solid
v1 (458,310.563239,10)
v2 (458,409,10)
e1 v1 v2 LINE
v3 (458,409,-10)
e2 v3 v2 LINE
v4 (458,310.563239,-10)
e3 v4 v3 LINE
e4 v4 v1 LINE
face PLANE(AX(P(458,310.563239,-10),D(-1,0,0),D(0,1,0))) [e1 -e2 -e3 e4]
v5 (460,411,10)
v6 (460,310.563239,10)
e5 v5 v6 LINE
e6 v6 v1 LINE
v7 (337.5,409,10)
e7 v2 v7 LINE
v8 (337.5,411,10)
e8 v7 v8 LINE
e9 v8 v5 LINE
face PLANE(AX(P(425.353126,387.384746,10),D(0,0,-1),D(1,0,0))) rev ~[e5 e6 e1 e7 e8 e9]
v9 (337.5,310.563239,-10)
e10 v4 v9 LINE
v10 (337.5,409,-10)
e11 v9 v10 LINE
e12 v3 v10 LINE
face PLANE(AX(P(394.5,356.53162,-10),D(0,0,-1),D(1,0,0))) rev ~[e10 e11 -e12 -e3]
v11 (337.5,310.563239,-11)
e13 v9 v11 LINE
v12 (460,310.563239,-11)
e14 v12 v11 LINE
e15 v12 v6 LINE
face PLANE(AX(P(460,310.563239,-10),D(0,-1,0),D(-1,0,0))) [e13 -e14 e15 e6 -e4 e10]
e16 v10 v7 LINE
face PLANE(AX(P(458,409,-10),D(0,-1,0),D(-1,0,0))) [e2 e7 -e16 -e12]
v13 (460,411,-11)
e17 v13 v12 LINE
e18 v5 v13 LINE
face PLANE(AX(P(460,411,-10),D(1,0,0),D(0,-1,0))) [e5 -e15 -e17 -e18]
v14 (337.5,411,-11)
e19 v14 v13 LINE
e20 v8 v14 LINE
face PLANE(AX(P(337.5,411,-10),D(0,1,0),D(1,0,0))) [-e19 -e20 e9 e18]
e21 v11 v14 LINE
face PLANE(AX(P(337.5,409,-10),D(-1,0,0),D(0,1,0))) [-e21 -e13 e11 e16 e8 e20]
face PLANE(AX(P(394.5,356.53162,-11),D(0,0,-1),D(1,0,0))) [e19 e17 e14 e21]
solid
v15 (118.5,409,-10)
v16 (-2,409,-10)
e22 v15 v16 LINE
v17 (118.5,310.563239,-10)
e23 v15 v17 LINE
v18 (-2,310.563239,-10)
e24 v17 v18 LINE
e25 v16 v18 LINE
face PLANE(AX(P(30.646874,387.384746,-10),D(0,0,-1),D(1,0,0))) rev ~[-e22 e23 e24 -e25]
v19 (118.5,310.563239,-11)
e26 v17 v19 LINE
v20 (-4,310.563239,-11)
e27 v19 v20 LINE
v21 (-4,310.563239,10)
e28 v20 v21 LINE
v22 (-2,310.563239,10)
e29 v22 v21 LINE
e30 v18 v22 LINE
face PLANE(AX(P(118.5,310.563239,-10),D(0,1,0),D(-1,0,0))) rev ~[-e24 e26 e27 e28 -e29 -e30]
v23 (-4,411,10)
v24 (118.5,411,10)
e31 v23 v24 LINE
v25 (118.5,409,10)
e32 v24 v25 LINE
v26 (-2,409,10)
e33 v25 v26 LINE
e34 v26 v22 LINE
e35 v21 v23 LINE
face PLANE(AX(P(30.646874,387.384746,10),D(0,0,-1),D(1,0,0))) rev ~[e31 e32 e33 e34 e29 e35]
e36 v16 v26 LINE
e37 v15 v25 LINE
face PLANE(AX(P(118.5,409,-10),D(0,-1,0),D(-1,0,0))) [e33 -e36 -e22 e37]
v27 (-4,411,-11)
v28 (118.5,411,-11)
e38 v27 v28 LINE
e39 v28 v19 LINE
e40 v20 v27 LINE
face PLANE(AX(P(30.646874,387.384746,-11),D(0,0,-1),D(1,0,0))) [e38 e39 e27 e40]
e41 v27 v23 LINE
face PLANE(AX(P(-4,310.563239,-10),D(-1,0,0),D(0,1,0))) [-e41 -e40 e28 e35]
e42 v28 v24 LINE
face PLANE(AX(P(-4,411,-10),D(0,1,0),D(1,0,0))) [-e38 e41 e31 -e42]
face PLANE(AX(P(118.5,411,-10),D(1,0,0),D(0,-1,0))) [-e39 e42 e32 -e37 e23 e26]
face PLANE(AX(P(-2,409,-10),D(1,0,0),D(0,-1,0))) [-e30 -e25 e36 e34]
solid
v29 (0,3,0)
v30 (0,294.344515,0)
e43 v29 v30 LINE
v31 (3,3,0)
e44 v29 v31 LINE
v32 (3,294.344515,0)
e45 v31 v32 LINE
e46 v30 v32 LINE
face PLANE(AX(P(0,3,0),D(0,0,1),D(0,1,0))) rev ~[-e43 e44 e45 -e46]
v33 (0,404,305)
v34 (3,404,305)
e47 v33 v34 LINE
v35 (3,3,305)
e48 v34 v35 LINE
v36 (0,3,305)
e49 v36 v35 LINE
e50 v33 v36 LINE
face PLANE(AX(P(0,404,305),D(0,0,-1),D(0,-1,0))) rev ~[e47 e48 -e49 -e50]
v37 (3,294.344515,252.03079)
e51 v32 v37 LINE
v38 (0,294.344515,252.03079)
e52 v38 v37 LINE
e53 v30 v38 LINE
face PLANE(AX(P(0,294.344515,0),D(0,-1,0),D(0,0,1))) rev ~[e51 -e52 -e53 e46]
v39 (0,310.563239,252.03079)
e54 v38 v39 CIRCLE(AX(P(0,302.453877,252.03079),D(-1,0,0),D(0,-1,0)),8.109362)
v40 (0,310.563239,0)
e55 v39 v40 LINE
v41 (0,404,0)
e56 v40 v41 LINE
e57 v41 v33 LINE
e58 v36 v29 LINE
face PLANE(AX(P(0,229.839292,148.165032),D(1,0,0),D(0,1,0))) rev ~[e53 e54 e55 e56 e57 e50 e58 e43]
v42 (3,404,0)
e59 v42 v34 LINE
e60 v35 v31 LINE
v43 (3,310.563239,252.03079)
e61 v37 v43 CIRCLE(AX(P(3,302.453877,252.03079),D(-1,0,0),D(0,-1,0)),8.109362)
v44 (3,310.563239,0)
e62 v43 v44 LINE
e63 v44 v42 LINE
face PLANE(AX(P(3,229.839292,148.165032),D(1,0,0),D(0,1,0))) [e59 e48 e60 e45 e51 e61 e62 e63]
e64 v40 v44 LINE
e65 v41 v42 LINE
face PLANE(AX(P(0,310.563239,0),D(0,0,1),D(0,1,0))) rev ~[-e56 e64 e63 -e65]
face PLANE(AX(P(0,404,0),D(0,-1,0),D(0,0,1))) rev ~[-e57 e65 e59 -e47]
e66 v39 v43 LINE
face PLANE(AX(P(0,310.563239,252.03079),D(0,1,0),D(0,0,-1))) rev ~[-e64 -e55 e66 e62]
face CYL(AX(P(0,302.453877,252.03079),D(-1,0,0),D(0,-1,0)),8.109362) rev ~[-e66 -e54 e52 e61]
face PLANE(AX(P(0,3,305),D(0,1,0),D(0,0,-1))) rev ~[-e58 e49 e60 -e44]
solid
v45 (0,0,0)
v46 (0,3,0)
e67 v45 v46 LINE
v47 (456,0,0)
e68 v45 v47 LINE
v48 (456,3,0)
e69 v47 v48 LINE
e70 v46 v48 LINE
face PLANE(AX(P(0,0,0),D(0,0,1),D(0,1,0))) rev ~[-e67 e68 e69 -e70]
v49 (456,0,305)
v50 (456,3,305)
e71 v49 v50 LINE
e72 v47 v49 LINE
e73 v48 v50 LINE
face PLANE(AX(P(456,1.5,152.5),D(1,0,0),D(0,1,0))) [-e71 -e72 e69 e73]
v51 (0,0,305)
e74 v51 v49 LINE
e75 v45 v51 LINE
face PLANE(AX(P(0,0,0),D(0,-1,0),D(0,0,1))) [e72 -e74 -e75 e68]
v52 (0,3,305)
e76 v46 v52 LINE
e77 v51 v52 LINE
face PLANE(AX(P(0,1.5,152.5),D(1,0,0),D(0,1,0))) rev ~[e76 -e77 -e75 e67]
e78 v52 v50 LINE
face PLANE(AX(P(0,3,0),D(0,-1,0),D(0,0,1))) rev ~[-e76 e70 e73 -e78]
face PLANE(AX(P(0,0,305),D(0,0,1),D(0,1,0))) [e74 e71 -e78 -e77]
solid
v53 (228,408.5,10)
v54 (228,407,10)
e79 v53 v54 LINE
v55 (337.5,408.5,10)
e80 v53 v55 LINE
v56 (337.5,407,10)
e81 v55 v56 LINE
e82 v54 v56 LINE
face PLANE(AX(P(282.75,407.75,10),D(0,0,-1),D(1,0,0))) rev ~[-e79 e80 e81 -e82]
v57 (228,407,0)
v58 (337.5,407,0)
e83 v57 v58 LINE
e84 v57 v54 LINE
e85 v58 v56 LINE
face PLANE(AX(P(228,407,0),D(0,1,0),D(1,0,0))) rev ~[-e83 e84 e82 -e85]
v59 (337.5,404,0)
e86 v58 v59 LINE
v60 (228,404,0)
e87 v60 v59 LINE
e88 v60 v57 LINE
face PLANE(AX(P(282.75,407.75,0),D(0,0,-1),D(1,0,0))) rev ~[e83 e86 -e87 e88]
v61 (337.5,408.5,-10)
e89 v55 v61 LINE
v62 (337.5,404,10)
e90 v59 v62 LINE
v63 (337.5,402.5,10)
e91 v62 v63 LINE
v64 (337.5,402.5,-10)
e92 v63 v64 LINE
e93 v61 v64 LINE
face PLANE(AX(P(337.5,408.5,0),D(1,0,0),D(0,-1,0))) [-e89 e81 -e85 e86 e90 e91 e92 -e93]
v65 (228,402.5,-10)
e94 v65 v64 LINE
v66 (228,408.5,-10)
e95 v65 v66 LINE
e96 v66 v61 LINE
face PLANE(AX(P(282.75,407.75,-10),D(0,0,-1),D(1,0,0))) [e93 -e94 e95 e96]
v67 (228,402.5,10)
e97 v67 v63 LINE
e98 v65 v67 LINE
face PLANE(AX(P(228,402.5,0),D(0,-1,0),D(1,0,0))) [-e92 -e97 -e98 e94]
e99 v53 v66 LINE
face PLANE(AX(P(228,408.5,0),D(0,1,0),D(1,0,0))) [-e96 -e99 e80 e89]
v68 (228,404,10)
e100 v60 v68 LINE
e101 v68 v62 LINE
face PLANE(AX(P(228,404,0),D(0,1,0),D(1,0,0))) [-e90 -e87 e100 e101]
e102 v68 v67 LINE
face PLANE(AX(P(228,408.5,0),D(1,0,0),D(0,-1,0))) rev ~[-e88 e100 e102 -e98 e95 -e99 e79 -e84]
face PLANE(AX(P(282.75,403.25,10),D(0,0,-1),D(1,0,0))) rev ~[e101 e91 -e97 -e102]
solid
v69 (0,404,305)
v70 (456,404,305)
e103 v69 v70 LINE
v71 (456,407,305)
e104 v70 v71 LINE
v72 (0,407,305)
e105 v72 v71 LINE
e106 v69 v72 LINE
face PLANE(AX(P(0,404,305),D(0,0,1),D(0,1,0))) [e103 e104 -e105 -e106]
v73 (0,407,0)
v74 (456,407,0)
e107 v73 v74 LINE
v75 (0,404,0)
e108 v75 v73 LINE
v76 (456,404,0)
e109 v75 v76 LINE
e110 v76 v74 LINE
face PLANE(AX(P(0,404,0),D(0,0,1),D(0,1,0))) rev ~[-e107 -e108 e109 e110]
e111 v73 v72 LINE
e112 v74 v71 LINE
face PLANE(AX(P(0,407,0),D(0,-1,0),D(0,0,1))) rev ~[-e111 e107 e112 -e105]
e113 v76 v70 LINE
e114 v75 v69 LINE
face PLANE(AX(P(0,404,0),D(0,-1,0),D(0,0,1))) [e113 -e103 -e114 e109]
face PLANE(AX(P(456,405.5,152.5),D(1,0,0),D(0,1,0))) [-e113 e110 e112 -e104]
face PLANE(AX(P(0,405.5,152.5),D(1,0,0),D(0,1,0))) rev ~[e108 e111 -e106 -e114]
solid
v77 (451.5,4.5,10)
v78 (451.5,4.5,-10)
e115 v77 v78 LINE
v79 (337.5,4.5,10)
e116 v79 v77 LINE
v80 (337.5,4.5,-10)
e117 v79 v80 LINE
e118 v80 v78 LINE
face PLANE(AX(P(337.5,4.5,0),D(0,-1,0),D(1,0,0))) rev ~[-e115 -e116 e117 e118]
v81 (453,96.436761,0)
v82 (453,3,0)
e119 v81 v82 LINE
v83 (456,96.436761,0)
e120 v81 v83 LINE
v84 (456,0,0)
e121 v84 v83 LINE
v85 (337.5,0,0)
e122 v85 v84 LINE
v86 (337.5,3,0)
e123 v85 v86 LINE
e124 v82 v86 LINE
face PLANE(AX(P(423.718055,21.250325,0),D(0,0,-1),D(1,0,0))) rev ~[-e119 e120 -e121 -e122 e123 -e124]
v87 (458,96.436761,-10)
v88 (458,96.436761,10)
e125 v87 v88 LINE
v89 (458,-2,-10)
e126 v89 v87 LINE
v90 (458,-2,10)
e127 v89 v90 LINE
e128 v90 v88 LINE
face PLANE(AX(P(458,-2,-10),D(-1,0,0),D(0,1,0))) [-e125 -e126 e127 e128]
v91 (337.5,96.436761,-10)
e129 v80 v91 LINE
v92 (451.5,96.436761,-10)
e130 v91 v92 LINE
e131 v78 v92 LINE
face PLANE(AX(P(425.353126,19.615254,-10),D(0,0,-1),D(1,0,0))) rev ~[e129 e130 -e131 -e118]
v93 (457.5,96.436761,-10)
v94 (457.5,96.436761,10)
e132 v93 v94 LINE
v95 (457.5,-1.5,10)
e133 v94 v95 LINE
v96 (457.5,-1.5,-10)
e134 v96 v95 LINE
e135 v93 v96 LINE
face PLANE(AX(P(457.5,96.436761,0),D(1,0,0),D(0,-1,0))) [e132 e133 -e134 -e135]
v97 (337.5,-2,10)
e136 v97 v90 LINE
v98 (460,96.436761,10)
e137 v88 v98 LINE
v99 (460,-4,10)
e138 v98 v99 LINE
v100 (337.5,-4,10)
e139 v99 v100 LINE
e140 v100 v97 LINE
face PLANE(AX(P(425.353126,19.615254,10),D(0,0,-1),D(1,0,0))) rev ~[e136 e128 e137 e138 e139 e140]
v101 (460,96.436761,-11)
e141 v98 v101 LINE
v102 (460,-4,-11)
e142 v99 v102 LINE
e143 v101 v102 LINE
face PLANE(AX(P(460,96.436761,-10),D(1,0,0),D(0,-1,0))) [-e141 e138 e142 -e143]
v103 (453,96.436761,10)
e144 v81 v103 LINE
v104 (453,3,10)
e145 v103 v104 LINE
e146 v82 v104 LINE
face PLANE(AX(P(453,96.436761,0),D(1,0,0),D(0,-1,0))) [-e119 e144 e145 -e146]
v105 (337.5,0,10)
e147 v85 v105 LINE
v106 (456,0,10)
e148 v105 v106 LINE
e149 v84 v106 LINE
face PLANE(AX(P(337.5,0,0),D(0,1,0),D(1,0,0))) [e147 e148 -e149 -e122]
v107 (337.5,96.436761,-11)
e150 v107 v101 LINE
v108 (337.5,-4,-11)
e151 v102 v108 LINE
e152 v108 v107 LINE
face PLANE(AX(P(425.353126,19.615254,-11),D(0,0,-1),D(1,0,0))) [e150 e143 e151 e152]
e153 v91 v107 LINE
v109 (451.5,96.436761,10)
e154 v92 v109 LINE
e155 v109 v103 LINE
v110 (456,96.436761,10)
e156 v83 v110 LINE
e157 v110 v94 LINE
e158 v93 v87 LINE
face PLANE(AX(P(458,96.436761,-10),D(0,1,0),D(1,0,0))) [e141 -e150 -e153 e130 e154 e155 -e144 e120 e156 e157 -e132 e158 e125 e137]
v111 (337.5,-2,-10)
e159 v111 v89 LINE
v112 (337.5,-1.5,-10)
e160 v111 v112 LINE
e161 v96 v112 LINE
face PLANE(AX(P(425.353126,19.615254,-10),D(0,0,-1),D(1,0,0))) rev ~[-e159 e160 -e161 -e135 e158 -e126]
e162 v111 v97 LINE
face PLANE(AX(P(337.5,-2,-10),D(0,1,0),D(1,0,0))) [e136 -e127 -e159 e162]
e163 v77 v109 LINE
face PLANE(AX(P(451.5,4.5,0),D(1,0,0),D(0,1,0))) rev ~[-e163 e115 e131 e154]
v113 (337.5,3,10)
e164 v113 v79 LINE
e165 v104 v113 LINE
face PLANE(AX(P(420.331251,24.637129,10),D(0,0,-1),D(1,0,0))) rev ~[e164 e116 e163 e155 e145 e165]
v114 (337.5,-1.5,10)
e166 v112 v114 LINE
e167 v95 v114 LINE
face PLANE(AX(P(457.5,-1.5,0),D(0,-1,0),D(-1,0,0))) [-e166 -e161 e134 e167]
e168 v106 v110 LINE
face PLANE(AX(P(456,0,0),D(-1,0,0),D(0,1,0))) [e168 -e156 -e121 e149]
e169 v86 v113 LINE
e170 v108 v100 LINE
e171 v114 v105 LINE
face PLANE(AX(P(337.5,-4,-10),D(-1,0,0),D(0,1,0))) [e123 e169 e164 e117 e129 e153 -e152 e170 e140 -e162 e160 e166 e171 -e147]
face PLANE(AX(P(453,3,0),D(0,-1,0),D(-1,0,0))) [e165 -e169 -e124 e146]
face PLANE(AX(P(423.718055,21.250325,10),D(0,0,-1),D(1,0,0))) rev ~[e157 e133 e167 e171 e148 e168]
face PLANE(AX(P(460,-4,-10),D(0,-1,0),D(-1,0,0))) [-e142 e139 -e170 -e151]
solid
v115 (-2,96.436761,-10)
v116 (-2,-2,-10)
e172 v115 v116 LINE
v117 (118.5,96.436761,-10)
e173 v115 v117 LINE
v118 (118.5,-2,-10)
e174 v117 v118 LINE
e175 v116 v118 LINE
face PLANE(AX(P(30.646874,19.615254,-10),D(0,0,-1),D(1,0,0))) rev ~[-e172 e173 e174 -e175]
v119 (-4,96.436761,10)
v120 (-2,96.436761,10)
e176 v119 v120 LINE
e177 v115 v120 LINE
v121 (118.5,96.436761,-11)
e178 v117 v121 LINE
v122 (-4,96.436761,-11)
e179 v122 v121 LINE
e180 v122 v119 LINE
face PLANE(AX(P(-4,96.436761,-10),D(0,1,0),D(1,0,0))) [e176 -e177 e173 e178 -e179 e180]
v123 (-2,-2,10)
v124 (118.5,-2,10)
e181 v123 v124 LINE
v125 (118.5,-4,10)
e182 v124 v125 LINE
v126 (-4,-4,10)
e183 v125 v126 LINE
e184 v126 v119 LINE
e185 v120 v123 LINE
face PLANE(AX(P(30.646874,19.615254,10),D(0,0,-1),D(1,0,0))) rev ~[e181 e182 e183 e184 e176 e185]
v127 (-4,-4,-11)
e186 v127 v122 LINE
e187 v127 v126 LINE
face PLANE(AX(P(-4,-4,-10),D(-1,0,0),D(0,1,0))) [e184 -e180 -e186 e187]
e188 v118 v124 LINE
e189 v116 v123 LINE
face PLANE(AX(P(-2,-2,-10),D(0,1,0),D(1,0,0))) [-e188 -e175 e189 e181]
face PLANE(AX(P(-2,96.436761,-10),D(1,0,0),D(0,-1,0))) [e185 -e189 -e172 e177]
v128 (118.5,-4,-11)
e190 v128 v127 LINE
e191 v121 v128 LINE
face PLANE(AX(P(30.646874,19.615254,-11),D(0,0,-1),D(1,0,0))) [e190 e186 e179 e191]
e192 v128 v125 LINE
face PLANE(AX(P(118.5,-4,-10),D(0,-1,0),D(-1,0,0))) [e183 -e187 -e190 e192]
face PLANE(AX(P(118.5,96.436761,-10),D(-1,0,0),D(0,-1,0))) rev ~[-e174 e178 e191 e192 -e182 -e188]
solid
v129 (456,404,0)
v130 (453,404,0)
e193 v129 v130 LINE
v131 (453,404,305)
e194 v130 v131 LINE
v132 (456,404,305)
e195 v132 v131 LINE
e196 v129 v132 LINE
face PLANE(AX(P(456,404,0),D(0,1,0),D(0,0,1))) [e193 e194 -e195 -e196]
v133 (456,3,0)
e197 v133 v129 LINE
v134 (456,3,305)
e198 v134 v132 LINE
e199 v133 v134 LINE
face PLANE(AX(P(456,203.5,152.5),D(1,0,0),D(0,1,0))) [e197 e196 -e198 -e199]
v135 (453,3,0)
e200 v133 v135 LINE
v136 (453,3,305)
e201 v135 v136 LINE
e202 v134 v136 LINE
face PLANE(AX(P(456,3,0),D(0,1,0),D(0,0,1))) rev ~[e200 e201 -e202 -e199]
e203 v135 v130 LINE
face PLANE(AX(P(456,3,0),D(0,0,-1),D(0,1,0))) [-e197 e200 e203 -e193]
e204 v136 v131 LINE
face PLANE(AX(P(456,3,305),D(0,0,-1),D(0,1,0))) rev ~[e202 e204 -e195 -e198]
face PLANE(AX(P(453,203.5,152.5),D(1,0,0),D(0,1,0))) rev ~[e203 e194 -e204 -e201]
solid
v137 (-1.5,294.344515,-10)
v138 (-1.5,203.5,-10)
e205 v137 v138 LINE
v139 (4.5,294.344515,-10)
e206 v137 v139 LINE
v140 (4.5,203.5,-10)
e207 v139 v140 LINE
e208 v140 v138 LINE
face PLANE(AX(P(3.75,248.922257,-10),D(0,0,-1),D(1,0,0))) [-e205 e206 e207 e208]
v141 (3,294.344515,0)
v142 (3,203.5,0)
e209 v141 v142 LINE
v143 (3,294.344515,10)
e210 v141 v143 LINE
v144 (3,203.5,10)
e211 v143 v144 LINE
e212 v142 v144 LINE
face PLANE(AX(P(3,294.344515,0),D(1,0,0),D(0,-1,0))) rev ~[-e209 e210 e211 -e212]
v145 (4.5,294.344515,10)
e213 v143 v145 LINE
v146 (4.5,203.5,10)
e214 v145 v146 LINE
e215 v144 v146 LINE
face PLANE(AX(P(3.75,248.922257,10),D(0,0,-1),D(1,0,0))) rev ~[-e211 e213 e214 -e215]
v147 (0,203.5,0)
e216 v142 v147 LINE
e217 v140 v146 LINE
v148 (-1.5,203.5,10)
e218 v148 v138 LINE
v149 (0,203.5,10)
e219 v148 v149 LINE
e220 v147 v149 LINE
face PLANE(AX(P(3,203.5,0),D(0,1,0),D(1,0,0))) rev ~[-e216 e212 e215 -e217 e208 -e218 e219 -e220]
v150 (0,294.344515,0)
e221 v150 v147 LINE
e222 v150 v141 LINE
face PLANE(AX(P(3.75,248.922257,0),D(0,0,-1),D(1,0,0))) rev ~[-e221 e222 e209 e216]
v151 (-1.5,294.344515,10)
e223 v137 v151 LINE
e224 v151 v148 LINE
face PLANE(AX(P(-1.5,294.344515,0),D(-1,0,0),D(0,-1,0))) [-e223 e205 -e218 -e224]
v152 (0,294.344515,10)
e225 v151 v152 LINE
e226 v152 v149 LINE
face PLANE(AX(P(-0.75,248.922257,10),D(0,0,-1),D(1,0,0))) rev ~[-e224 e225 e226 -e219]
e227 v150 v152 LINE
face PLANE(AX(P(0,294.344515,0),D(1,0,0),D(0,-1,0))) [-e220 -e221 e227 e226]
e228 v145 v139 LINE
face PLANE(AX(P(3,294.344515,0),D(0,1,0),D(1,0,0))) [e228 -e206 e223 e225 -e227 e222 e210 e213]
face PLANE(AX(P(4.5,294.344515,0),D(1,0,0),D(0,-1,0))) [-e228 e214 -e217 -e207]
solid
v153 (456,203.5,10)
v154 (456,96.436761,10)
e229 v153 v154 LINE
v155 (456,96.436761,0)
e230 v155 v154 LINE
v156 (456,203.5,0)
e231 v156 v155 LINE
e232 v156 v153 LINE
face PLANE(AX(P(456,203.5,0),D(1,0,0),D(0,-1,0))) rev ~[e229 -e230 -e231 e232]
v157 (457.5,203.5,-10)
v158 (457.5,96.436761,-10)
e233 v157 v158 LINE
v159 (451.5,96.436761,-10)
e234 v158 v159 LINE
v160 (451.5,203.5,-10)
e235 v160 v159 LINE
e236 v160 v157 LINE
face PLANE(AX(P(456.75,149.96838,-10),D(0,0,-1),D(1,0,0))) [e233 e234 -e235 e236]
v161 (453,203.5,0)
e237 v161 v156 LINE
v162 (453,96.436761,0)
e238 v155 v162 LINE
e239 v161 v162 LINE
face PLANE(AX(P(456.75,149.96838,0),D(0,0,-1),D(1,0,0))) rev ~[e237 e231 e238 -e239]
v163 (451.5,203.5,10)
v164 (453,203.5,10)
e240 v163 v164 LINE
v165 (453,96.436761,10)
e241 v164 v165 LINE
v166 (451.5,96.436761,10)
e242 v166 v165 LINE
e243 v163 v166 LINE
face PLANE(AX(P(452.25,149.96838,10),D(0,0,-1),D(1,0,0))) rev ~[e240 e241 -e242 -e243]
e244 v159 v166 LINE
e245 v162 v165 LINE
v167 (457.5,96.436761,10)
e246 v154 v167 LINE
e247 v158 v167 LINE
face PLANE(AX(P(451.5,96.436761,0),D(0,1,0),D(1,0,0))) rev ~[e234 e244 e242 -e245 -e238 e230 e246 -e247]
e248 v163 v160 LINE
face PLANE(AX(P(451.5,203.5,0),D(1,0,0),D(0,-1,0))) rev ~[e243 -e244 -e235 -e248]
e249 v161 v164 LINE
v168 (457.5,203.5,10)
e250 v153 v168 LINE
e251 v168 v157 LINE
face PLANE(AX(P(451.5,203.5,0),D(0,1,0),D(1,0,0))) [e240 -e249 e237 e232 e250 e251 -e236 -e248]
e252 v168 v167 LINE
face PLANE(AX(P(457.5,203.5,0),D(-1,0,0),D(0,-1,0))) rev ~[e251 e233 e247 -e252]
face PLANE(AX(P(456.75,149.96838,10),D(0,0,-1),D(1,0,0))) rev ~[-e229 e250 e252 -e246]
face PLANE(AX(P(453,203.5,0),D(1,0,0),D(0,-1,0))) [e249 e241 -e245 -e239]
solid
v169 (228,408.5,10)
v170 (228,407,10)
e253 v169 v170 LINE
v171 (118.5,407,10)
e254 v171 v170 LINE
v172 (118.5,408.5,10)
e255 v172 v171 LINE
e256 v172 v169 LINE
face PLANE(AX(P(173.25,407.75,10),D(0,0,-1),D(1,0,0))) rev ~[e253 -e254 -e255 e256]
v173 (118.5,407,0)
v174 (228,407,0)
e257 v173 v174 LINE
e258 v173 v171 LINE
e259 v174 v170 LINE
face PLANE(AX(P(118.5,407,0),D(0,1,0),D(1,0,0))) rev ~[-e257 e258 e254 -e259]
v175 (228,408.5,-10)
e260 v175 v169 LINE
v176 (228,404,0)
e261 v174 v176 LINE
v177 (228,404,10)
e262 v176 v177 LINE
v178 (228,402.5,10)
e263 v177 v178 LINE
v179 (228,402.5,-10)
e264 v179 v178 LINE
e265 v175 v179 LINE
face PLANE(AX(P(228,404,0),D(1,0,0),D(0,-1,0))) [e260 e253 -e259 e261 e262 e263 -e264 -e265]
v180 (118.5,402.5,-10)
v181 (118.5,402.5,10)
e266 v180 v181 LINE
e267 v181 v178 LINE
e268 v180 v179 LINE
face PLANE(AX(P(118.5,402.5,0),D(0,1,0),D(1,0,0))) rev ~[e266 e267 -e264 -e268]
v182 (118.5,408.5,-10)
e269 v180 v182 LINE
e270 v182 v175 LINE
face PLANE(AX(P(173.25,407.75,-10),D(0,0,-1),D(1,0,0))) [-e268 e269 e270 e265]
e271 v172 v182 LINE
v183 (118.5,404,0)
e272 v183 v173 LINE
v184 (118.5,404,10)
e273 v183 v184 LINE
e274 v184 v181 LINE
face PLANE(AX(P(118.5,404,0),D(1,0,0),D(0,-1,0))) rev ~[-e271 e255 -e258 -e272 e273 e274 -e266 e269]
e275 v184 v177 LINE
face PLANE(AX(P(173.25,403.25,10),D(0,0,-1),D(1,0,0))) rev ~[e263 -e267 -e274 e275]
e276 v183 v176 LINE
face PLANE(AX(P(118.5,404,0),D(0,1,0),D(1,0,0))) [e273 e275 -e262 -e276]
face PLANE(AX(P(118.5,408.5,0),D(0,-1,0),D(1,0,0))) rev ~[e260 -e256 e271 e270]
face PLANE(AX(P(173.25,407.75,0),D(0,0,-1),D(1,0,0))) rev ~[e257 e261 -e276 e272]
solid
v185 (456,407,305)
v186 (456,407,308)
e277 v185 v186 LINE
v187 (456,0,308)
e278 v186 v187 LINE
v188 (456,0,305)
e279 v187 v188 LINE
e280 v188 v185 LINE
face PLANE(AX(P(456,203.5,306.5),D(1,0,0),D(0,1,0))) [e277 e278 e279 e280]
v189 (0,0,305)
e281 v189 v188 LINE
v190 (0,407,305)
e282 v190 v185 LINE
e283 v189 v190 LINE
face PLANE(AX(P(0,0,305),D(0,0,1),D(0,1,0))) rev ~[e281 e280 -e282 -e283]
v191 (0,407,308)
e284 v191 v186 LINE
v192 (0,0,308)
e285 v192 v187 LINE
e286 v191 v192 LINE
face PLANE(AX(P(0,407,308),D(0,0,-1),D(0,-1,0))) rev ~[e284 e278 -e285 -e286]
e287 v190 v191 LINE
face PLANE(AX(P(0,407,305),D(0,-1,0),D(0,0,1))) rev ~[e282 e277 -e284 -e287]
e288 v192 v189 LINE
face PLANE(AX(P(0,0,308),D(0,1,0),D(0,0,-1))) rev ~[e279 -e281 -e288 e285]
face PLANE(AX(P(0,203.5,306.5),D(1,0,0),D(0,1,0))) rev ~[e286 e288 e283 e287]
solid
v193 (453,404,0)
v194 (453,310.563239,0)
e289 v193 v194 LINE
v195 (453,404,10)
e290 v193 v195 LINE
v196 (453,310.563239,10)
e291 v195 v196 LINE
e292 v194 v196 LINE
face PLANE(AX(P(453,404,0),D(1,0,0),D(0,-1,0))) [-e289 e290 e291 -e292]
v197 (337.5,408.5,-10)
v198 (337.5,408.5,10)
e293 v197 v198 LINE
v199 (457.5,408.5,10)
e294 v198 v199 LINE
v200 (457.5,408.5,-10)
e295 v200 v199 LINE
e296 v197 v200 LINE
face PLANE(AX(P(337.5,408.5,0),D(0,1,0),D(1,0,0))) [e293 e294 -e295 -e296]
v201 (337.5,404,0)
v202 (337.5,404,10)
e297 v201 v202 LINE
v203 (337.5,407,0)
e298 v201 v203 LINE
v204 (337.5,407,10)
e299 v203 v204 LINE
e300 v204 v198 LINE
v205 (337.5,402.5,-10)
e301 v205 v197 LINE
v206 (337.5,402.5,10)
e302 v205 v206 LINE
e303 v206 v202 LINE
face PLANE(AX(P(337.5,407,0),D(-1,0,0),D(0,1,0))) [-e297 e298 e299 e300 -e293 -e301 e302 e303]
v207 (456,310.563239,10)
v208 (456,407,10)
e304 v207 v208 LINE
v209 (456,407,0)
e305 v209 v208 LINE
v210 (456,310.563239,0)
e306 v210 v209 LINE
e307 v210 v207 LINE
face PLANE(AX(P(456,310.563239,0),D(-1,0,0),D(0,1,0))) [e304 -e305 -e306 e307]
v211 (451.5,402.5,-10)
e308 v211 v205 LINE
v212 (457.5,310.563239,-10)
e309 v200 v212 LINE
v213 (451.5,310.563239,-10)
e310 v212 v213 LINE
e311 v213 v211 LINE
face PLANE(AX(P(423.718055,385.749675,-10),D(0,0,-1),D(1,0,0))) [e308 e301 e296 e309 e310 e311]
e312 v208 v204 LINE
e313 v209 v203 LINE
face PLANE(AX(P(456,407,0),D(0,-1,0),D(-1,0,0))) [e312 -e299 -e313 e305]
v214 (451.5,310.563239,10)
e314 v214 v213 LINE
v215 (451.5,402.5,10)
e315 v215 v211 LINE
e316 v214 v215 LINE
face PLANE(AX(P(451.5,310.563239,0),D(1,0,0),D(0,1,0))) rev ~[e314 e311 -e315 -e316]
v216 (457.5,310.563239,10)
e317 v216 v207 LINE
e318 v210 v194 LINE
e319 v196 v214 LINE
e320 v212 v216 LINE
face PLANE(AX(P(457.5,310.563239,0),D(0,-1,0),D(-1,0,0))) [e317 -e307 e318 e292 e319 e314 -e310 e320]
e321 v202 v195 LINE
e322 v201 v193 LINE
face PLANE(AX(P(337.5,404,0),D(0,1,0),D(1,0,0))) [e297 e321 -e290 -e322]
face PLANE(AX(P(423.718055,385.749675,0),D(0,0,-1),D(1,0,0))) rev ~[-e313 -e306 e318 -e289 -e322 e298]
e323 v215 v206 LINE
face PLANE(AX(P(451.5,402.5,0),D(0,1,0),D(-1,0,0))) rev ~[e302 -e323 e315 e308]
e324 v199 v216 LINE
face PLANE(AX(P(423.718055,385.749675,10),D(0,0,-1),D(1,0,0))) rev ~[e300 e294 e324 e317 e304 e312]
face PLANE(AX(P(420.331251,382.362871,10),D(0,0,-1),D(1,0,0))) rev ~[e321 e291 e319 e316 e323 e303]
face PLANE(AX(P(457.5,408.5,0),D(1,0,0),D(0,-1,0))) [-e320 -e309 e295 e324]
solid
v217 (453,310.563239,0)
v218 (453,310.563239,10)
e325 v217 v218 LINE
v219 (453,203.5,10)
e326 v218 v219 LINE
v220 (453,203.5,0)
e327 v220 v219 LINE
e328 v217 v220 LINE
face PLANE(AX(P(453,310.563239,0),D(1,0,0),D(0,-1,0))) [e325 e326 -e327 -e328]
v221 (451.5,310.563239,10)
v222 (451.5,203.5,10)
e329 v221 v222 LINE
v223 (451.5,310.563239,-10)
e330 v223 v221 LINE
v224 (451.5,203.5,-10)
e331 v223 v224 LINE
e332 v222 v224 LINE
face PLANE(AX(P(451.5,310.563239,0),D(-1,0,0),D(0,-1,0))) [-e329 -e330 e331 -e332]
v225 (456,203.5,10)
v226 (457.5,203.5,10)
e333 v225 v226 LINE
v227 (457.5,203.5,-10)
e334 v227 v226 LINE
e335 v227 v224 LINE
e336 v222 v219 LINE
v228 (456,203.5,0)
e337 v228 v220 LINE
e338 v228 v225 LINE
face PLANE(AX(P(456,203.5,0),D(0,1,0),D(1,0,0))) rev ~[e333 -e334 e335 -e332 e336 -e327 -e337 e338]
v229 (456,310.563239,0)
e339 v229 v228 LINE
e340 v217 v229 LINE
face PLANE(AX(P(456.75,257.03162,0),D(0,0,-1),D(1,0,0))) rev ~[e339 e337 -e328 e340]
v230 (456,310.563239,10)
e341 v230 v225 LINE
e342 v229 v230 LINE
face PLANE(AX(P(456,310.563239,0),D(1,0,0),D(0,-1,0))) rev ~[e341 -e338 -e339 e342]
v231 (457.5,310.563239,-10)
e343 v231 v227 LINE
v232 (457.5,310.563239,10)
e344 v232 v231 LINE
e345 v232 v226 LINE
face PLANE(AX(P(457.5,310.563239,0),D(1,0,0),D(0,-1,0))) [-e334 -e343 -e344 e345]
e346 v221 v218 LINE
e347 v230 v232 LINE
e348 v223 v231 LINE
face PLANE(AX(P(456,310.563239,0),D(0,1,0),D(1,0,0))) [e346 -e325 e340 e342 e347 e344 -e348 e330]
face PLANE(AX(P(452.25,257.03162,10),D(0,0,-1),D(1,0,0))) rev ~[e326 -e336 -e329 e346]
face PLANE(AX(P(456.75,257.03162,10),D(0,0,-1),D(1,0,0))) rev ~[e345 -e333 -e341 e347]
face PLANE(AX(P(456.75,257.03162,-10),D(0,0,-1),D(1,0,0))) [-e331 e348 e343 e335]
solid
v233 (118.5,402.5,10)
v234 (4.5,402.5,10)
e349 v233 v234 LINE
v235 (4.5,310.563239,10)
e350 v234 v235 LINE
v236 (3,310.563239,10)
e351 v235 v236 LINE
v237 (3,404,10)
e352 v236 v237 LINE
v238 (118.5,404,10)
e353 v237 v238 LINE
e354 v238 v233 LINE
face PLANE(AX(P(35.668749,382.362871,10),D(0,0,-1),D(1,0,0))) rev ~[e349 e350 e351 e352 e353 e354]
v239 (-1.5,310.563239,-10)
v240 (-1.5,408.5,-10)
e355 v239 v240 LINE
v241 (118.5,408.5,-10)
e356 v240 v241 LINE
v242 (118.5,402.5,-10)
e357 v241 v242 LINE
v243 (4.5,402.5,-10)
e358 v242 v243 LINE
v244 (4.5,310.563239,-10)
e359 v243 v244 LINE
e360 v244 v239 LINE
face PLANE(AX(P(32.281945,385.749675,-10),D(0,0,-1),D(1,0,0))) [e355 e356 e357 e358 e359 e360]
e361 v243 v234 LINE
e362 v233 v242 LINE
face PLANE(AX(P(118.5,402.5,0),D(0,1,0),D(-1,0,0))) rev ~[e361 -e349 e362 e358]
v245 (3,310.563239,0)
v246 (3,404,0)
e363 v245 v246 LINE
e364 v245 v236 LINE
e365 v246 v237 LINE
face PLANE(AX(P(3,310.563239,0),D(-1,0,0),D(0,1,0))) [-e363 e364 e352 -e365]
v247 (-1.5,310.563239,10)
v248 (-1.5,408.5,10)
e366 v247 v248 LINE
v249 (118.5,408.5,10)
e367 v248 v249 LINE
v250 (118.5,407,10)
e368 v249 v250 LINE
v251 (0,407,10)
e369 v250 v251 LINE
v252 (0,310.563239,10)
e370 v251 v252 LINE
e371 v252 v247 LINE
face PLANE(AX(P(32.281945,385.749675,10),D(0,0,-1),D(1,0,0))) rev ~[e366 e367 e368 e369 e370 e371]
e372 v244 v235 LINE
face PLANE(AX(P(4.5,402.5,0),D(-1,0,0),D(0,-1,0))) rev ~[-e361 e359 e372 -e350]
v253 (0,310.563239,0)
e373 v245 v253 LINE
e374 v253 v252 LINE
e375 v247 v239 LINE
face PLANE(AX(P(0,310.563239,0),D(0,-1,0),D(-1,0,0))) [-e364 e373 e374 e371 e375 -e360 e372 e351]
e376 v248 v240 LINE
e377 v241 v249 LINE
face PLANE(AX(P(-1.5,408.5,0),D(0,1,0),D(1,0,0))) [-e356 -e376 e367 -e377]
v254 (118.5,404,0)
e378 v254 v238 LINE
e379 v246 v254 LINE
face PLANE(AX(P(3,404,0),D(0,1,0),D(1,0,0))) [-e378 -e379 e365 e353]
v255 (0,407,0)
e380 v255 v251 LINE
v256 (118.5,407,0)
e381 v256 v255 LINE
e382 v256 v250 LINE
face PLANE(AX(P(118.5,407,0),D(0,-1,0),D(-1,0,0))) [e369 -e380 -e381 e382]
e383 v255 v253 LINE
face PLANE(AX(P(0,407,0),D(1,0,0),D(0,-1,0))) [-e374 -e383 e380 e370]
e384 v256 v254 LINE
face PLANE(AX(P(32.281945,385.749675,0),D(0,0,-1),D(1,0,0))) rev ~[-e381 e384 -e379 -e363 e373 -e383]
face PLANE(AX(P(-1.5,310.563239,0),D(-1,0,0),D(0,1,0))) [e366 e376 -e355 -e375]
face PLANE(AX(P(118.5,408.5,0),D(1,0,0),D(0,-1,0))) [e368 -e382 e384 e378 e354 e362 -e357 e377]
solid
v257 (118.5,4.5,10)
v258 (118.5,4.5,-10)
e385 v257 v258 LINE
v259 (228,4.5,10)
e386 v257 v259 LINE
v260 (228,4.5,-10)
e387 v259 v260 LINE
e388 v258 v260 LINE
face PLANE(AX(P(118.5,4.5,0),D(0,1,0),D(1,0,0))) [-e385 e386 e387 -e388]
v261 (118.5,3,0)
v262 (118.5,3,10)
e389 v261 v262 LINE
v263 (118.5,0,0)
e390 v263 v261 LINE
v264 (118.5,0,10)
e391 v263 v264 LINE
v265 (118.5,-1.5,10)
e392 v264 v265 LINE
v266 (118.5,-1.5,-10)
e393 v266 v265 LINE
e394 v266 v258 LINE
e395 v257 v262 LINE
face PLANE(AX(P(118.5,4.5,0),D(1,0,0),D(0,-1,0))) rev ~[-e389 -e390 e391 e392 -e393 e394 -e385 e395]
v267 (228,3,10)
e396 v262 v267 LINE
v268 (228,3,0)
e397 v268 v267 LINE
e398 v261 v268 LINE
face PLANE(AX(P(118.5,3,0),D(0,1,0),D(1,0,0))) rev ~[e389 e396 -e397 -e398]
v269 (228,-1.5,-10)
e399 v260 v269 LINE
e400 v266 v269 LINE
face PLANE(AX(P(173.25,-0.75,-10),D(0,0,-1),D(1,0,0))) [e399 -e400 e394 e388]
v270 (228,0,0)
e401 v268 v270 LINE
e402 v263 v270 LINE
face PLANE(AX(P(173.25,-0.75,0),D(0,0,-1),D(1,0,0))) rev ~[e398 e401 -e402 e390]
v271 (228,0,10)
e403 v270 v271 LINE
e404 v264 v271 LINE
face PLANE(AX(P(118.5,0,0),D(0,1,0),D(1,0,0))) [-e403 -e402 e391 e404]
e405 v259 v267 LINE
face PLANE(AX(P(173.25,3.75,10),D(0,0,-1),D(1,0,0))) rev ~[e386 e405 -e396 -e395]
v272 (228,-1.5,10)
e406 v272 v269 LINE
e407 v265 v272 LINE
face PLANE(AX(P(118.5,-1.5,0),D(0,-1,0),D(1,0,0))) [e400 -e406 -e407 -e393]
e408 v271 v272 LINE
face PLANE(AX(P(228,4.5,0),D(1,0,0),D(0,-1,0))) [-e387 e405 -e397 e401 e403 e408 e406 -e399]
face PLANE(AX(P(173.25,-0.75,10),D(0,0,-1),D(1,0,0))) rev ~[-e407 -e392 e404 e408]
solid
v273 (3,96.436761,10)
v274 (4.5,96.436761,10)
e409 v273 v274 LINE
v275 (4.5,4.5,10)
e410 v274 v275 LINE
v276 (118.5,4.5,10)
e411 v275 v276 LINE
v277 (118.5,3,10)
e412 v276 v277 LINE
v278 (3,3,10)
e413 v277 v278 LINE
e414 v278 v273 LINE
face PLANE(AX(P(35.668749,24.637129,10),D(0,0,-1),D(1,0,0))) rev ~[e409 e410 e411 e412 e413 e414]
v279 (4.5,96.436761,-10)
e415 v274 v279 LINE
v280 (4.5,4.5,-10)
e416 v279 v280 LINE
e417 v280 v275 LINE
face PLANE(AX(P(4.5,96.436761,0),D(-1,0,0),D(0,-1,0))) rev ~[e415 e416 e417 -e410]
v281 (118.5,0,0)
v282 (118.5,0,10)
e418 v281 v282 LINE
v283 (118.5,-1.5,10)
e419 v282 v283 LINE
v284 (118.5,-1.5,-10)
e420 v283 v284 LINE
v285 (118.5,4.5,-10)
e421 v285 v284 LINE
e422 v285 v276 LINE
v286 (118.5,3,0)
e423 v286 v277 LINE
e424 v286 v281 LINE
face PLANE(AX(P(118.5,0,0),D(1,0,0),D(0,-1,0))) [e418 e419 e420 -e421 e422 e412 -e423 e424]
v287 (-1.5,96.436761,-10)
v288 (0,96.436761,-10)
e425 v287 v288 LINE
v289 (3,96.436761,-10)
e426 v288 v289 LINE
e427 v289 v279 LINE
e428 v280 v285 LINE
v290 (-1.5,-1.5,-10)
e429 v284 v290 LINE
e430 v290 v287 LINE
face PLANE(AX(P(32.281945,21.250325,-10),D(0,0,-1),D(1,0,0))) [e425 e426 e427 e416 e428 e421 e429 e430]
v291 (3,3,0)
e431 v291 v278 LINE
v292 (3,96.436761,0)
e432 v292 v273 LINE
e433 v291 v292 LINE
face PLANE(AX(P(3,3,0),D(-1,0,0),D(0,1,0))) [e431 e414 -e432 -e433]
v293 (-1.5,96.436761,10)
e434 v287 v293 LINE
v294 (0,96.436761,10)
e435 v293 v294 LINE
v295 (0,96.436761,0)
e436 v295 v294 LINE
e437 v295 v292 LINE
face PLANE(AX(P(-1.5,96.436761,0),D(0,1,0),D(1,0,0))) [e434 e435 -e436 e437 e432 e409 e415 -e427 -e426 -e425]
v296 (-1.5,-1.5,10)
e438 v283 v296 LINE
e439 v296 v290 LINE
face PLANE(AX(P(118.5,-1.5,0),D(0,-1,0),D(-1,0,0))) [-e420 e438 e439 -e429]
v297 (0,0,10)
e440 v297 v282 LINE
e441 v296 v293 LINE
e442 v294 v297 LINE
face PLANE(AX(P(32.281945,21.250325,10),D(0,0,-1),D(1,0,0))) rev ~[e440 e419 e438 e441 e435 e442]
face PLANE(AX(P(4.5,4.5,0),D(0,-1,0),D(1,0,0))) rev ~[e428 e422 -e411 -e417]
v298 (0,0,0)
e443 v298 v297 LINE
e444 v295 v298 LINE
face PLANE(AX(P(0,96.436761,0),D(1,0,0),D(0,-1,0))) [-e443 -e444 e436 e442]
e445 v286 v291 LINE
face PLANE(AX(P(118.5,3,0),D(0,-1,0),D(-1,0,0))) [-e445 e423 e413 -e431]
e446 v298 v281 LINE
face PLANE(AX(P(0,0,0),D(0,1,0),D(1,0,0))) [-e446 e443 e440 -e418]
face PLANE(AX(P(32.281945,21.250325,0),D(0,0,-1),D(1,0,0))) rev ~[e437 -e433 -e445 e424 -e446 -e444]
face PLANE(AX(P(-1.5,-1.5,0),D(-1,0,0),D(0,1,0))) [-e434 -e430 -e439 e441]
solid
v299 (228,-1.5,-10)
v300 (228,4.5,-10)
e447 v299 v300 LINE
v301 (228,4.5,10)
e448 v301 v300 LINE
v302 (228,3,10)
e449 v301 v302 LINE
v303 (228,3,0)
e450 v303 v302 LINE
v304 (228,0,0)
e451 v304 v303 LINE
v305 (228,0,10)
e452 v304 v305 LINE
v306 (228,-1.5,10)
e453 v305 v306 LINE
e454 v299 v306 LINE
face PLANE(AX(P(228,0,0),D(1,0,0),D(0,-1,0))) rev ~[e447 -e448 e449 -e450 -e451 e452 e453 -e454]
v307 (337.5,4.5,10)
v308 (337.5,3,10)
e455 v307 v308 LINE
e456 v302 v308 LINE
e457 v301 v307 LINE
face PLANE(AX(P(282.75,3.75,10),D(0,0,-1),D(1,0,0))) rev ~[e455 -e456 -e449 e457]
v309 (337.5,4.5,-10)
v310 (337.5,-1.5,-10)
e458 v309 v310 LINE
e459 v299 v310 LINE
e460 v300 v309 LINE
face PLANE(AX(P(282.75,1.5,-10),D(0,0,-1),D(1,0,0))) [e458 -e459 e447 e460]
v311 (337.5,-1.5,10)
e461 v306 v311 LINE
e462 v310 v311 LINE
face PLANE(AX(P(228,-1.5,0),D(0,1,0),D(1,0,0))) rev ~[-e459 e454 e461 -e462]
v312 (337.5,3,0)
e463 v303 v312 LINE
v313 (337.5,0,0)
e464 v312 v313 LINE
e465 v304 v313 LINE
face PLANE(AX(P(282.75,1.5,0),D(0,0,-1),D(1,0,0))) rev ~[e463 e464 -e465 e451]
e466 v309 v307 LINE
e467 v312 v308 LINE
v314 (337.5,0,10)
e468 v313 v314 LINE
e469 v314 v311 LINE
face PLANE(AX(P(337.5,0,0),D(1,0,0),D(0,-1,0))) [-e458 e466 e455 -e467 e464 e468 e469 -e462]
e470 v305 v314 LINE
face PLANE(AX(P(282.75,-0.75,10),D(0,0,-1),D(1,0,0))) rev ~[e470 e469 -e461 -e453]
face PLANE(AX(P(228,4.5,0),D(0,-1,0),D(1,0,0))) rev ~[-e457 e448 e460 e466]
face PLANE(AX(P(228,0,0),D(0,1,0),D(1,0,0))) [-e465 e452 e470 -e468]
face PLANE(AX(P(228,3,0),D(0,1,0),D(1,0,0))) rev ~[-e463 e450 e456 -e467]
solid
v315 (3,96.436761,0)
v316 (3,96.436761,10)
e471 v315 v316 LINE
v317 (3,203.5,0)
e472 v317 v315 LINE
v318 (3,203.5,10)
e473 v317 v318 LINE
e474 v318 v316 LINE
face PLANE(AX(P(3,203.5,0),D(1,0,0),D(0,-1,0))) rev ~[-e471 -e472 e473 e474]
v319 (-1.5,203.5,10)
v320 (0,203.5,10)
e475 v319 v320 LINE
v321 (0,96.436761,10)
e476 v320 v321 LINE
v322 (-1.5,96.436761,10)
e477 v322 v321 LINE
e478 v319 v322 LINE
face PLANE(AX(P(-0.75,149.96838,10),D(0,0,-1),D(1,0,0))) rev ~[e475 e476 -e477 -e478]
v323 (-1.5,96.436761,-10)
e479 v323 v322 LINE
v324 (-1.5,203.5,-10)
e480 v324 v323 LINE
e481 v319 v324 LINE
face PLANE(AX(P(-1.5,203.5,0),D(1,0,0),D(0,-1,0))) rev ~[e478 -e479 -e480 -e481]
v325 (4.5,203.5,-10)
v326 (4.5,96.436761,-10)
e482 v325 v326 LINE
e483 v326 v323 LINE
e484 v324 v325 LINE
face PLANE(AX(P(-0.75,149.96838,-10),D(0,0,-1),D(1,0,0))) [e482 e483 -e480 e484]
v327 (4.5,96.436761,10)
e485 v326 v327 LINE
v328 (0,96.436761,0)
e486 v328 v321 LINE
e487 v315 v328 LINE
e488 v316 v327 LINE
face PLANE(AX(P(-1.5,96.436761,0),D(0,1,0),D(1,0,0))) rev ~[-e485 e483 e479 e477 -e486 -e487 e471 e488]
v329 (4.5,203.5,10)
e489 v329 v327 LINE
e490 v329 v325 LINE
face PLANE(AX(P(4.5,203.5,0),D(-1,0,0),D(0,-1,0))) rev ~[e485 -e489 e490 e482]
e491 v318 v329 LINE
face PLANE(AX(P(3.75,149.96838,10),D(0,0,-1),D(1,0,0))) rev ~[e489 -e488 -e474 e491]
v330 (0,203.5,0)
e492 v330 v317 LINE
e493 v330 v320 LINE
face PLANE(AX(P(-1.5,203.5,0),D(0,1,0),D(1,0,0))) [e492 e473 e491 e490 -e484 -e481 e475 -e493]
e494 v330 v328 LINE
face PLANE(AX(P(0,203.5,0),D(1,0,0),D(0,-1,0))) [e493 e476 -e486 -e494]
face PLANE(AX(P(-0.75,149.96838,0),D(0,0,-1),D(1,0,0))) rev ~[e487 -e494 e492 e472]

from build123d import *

# Parameters (mm, degrees)
F1_DEPTH  = 3
F2_DEPTH  = 456
F0_W      = 3
F0_H      = 305
F3_DEPTH  = 456
F4_W      = 401
F4_H      = 305
F5_DEPTH  = 3
F6_W      = 3
F6_H      = 93.4367607989
F7_DEPTH  = 10
F8_DEPTH  = 10
F6_W_2    = 109.5
F6_H_2    = 3
F6_H_3    = 1.5
F9_DEPTH  = 10
F6_W_3    = 1.5
F6_H_4    = 107.0632392011
F10_DEPTH = 10
F11_DEPTH = 10
F6_H_5    = 90.8445146084
F12_DEPTH = 10
F13_W     = 114
F13_H     = 91.9367607989
F14_DEPTH = 1
F15_DEPTH = 20


with BuildPart() as f1:
    # F0 (on Right) → F1 (new body)
    with BuildSketch(Plane.YZ):
        with BuildLine():
            Line((404, 305), (3, 305))
            Line((3, 305), (3, 0))
            Line((3, 0), (294.3445146084, 0))
            Line((294.3445146084, 0), (294.3445146084, 252.0307898521))
            ThreePointArc((294.3445146084, 252.0307898521), (302.4538769047, 260.1401521485), (310.5632392011, 252.0307898521))
            Line((310.5632392011, 252.0307898521), (310.5632392011, 0))
            Line((310.5632392011, 0), (404, 0))
            Line((404, 0), (404, 305))
        make_face()
    extrude(amount=F1_DEPTH)


with BuildPart() as f2:
    # F0 (on Right) → F2 (new body)
    with BuildSketch(Plane.YZ):
        Polygon((407, 308), (0, 308), (0, 305), (3, 305), (404, 305), (407, 305), align=None)
    extrude(amount=F2_DEPTH)


with BuildPart() as f3:
    # F0 (on Right) → F3 (new body)
    with BuildSketch(Plane.YZ):
        with Locations((1.5, 152.5)):
            Rectangle(F0_W, F0_H)
    extrude(amount=F3_DEPTH)


with BuildPart() as f3b:
    # F0 (on Right) → F3, piece 2 (new body)
    with BuildSketch(Plane.YZ):
        with Locations((405.5, 152.5)):
            Rectangle(F0_W, F0_H)
    extrude(amount=F3_DEPTH)


with BuildPart() as f5:
    # F4 (on face) → F5 (new body)
    with BuildSketch(Plane.YZ.offset(456)):
        with Locations((203.5, 152.5)):
            Rectangle(F4_W, F4_H)
    extrude(amount=-F5_DEPTH)


with BuildPart() as f7:
    # F6 (on face) → F7 (new body)
    with BuildSketch(Plane(origin=(0, 0, 0), x_dir=(1, 0, 0), z_dir=(0, 0, -1))):
        Polygon((0, -3), (0, 0), (118.5, 0), (118.5, 1.5), (-1.5, 1.5), (-1.5, -96.4367607989), (0, -96.4367607989), align=None)
        Polygon((118.5, 0), (0, 0), (0, -3), (3, -3), (118.5, -3), align=None)
        Polygon((118.5, -4.5), (118.5, -3), (3, -3), (3, -96.4367607989), (4.5, -96.4367607989), (4.5, -4.5), align=None)
        with Locations((1.5, -49.7183803995)):
            Rectangle(F6_W, F6_H)
    extrude(amount=F7_DEPTH)

    # F6 (on face) → F8, piece 4 (join)
    with BuildSketch(Plane(origin=(0, 0, 0), x_dir=(1, 0, 0), z_dir=(0, 0, -1))):
        Polygon((0, -3), (0, 0), (118.5, 0), (118.5, 1.5), (-1.5, 1.5), (-1.5, -96.4367607989), (0, -96.4367607989), align=None)
        Polygon((118.5, -4.5), (118.5, -3), (3, -3), (3, -96.4367607989), (4.5, -96.4367607989), (4.5, -4.5), align=None)
    extrude(amount=-F8_DEPTH)


with BuildPart() as f7b:
    # F6 (on face) → F7, piece 2 (new body)
    with BuildSketch(Plane(origin=(0, 0, 0), x_dir=(1, 0, 0), z_dir=(0, 0, -1))):
        Polygon((0, -407), (0, -310.5632392011), (-1.5, -310.5632392011), (-1.5, -408.5), (118.5, -408.5), (118.5, -407), align=None)
        Polygon((3, -310.5632392011), (0, -310.5632392011), (0, -407), (118.5, -407), (118.5, -404), (3, -404), align=None)
        Polygon((4.5, -310.5632392011), (3, -310.5632392011), (3, -404), (118.5, -404), (118.5, -402.5), (4.5, -402.5), align=None)
    extrude(amount=F7_DEPTH)

    # F6 (on face) → F8, piece 3 (join)
    with BuildSketch(Plane(origin=(0, 0, 0), x_dir=(1, 0, 0), z_dir=(0, 0, -1))):
        Polygon((0, -407), (0, -310.5632392011), (-1.5, -310.5632392011), (-1.5, -408.5), (118.5, -408.5), (118.5, -407), align=None)
        Polygon((4.5, -310.5632392011), (3, -310.5632392011), (3, -404), (118.5, -404), (118.5, -402.5), (4.5, -402.5), align=None)
    extrude(amount=-F8_DEPTH)


with BuildPart() as f7c:
    # F6 (on face) → F7, piece 3 (new body)
    with BuildSketch(Plane(origin=(0, 0, 0), x_dir=(1, 0, 0), z_dir=(0, 0, -1))):
        Polygon((457.5, -310.5632392011), (456, -310.5632392011), (456, -407), (337.5, -407), (337.5, -408.5), (457.5, -408.5), align=None)
        Polygon((456, -407), (456, -310.5632392011), (453, -310.5632392011), (453, -404), (337.5, -404), (337.5, -407), align=None)
        Polygon((453, -404), (453, -310.5632392011), (451.5, -310.5632392011), (451.5, -402.5), (337.5, -402.5), (337.5, -404), align=None)
    extrude(amount=F7_DEPTH)

    # F6 (on face) → F8 (join)
    with BuildSketch(Plane(origin=(0, 0, 0), x_dir=(1, 0, 0), z_dir=(0, 0, -1))):
        Polygon((457.5, -310.5632392011), (456, -310.5632392011), (456, -407), (337.5, -407), (337.5, -408.5), (457.5, -408.5), align=None)
        Polygon((453, -404), (453, -310.5632392011), (451.5, -310.5632392011), (451.5, -402.5), (337.5, -402.5), (337.5, -404), align=None)
    extrude(amount=-F8_DEPTH)


with BuildPart() as f7d:
    # F6 (on face) → F7, piece 4 (new body)
    with BuildSketch(Plane(origin=(0, 0, 0), x_dir=(1, 0, 0), z_dir=(0, 0, -1))):
        Polygon((337.5, 1.5), (337.5, 0), (456, 0), (456, -3), (456, -96.4367607989), (457.5, -96.4367607989), (457.5, 1.5), align=None)
        Polygon((456, 0), (337.5, 0), (337.5, -3), (453, -3), (456, -3), align=None)
        Polygon((453, -3), (337.5, -3), (337.5, -4.5), (451.5, -4.5), (451.5, -96.4367607989), (453, -96.4367607989), align=None)
        with Locations((454.5, -49.7183803995)):
            Rectangle(F6_W, F6_H)
    extrude(amount=F7_DEPTH)

    # F6 (on face) → F8, piece 2 (join)
    with BuildSketch(Plane(origin=(0, 0, 0), x_dir=(1, 0, 0), z_dir=(0, 0, -1))):
        Polygon((337.5, 1.5), (337.5, 0), (456, 0), (456, -3), (456, -96.4367607989), (457.5, -96.4367607989), (457.5, 1.5), align=None)
        Polygon((453, -3), (337.5, -3), (337.5, -4.5), (451.5, -4.5), (451.5, -96.4367607989), (453, -96.4367607989), align=None)
    extrude(amount=-F8_DEPTH)

    # F13 (on face) → F14 (join)
    with BuildSketch(Plane(origin=(0, 0, -10), x_dir=(1, 0, 0), z_dir=(0, 0, -1))):
        Polygon((458, 2), (458, -96.4367607989), (460, -96.4367607989), (460, 4), (337.5, 4), (337.5, 2), align=None)
        Polygon((451.5, -96.4367607989), (457.5, -96.4367607989), (457.5, 1.5), (337.5, 1.5), (337.5, -4.5), (451.5, -4.5), align=None)
        with Locations((394.5, -50.4683803995)):
            Rectangle(F13_W, F13_H)
        Polygon((457.5, 1.5), (457.5, -96.4367607989), (458, -96.4367607989), (458, 2), (337.5, 2), (337.5, 1.5), align=None)
    extrude(amount=F14_DEPTH)

    # F13 (on face) → F15 (join)
    with BuildSketch(Plane(origin=(0, 0, -10), x_dir=(1, 0, 0), z_dir=(0, 0, -1))):
        Polygon((458, 2), (458, -96.4367607989), (460, -96.4367607989), (460, 4), (337.5, 4), (337.5, 2), align=None)
    extrude(amount=-F15_DEPTH)


with BuildPart() as f9:
    # F6 (on face) → F9 (new body)
    with BuildSketch(Plane(origin=(0, 0, 0), x_dir=(1, 0, 0), z_dir=(0, 0, -1))):
        with Locations((282.75, -1.5)):
            Rectangle(F6_W_2, F6_H_2)
        with Locations((282.75, -3.75)):
            Rectangle(F6_W_2, F6_H_3)
        with Locations((282.75, 0.75)):
            Rectangle(F6_W_2, F6_H_3)
    extrude(amount=F9_DEPTH)

    # F6 (on face) → F10, piece 2 (join)
    with BuildSketch(Plane(origin=(0, 0, 0), x_dir=(1, 0, 0), z_dir=(0, 0, -1))):
        with Locations((282.75, 0.75)):
            Rectangle(F6_W_2, F6_H_3)
        with Locations((282.75, -3.75)):
            Rectangle(F6_W_2, F6_H_3)
    extrude(amount=-F10_DEPTH)


with BuildPart() as f9b:
    # F6 (on face) → F9, piece 2 (new body)
    with BuildSketch(Plane(origin=(0, 0, 0), x_dir=(1, 0, 0), z_dir=(0, 0, -1))):
        with Locations((173.25, -407.75)):
            Rectangle(F6_W_2, F6_H_3)
        with Locations((173.25, -405.5)):
            Rectangle(F6_W_2, F6_H_2)
        with Locations((173.25, -403.25)):
            Rectangle(F6_W_2, F6_H_3)
    extrude(amount=F9_DEPTH)

    # F6 (on face) → F10, piece 3 (join)
    with BuildSketch(Plane(origin=(0, 0, 0), x_dir=(1, 0, 0), z_dir=(0, 0, -1))):
        with Locations((173.25, -403.25)):
            Rectangle(F6_W_2, F6_H_3)
        with Locations((173.25, -407.75)):
            Rectangle(F6_W_2, F6_H_3)
    extrude(amount=-F10_DEPTH)


with BuildPart() as f9c:
    # F6 (on face) → F9, piece 3 (new body)
    with BuildSketch(Plane(origin=(0, 0, 0), x_dir=(1, 0, 0), z_dir=(0, 0, -1))):
        with Locations((456.75, -257.0316196005)):
            Rectangle(F6_W_3, F6_H_4)
        with Locations((454.5, -257.0316196005)):
            Rectangle(F6_W, F6_H_4)
        with Locations((452.25, -257.0316196005)):
            Rectangle(F6_W_3, F6_H_4)
    extrude(amount=F9_DEPTH)

    # F6 (on face) → F10 (join)
    with BuildSketch(Plane(origin=(0, 0, 0), x_dir=(1, 0, 0), z_dir=(0, 0, -1))):
        with Locations((456.75, -257.0316196005)):
            Rectangle(F6_W_3, F6_H_4)
        with Locations((452.25, -257.0316196005)):
            Rectangle(F6_W_3, F6_H_4)
    extrude(amount=-F10_DEPTH)


with BuildPart() as f9d:
    # F6 (on face) → F9, piece 4 (new body)
    with BuildSketch(Plane(origin=(0, 0, 0), x_dir=(1, 0, 0), z_dir=(0, 0, -1))):
        with Locations((-0.75, -149.9683803995)):
            Rectangle(F6_W_3, F6_H_4)
        with Locations((1.5, -149.9683803995)):
            Rectangle(F6_W, F6_H_4)
        with Locations((3.75, -149.9683803995)):
            Rectangle(F6_W_3, F6_H_4)
    extrude(amount=F9_DEPTH)

    # F6 (on face) → F10, piece 4 (join)
    with BuildSketch(Plane(origin=(0, 0, 0), x_dir=(1, 0, 0), z_dir=(0, 0, -1))):
        with Locations((-0.75, -149.9683803995)):
            Rectangle(F6_W_3, F6_H_4)
        with Locations((3.75, -149.9683803995)):
            Rectangle(F6_W_3, F6_H_4)
    extrude(amount=-F10_DEPTH)


with BuildPart() as f11:
    # F6 (on face) → F11 (new body)
    with BuildSketch(Plane(origin=(0, 0, 0), x_dir=(1, 0, 0), z_dir=(0, 0, -1))):
        with Locations((282.75, -407.75)):
            Rectangle(F6_W_2, F6_H_3)
        with Locations((282.75, -405.5)):
            Rectangle(F6_W_2, F6_H_2)
        with Locations((282.75, -403.25)):
            Rectangle(F6_W_2, F6_H_3)
    extrude(amount=F11_DEPTH)

    # F6 (on face) → F12, piece 2 (join)
    with BuildSketch(Plane(origin=(0, 0, 0), x_dir=(1, 0, 0), z_dir=(0, 0, -1))):
        with Locations((282.75, -407.75)):
            Rectangle(F6_W_2, F6_H_3)
        with Locations((282.75, -403.25)):
            Rectangle(F6_W_2, F6_H_3)
    extrude(amount=-F12_DEPTH)


with BuildPart() as f11b:
    # F6 (on face) → F11, piece 2 (new body)
    with BuildSketch(Plane(origin=(0, 0, 0), x_dir=(1, 0, 0), z_dir=(0, 0, -1))):
        with Locations((456.75, -149.9683803995)):
            Rectangle(F6_W_3, F6_H_4)
        with Locations((454.5, -149.9683803995)):
            Rectangle(F6_W, F6_H_4)
        with Locations((452.25, -149.9683803995)):
            Rectangle(F6_W_3, F6_H_4)
    extrude(amount=F11_DEPTH)

    # F6 (on face) → F12, piece 4 (join)
    with BuildSketch(Plane(origin=(0, 0, 0), x_dir=(1, 0, 0), z_dir=(0, 0, -1))):
        with Locations((452.25, -149.9683803995)):
            Rectangle(F6_W_3, F6_H_4)
        with Locations((456.75, -149.9683803995)):
            Rectangle(F6_W_3, F6_H_4)
    extrude(amount=-F12_DEPTH)


with BuildPart() as f11c:
    # F6 (on face) → F11, piece 3 (new body)
    with BuildSketch(Plane(origin=(0, 0, 0), x_dir=(1, 0, 0), z_dir=(0, 0, -1))):
        with Locations((173.25, 0.75)):
            Rectangle(F6_W_2, F6_H_3)
        with Locations((173.25, -1.5)):
            Rectangle(F6_W_2, F6_H_2)
        with Locations((173.25, -3.75)):
            Rectangle(F6_W_2, F6_H_3)
    extrude(amount=F11_DEPTH)

    # F6 (on face) → F12, piece 3 (join)
    with BuildSketch(Plane(origin=(0, 0, 0), x_dir=(1, 0, 0), z_dir=(0, 0, -1))):
        with Locations((173.25, -3.75)):
            Rectangle(F6_W_2, F6_H_3)
        with Locations((173.25, 0.75)):
            Rectangle(F6_W_2, F6_H_3)
    extrude(amount=-F12_DEPTH)


with BuildPart() as f11d:
    # F6 (on face) → F11, piece 4 (new body)
    with BuildSketch(Plane(origin=(0, 0, 0), x_dir=(1, 0, 0), z_dir=(0, 0, -1))):
        with Locations((3.75, -248.9222573042)):
            Rectangle(F6_W_3, F6_H_5)
        with Locations((1.5, -248.9222573042)):
            Rectangle(F6_W, F6_H_5)
        with Locations((-0.75, -248.9222573042)):
            Rectangle(F6_W_3, F6_H_5)
    extrude(amount=F11_DEPTH)

    # F6 (on face) → F12 (join)
    with BuildSketch(Plane(origin=(0, 0, 0), x_dir=(1, 0, 0), z_dir=(0, 0, -1))):
        with Locations((3.75, -248.9222573042)):
            Rectangle(F6_W_3, F6_H_5)
        with Locations((-0.75, -248.9222573042)):
            Rectangle(F6_W_3, F6_H_5)
    extrude(amount=-F12_DEPTH)


with BuildPart() as f14:
    # F13 (on face) → F14, piece 2 (new body)
    with BuildSketch(Plane(origin=(0, 0, -10), x_dir=(1, 0, 0), z_dir=(0, 0, -1))):
        with Locations((394.5, -356.5316196005)):
            Rectangle(F13_W, F13_H)
        Polygon((337.5, -408.5), (457.5, -408.5), (457.5, -310.5632392011), (451.5, -310.5632392011), (451.5, -402.5), (337.5, -402.5), align=None)
        Polygon((458, -409), (337.5, -409), (337.5, -411), (460, -411), (460, -310.5632392011), (458, -310.5632392011), align=None)
        Polygon((457.5, -310.5632392011), (457.5, -408.5), (337.5, -408.5), (337.5, -409), (458, -409), (458, -310.5632392011), align=None)
    extrude(amount=F14_DEPTH)

    # F13 (on face) → F15, piece 4 (join)
    with BuildSketch(Plane(origin=(0, 0, -10), x_dir=(1, 0, 0), z_dir=(0, 0, -1))):
        Polygon((458, -409), (337.5, -409), (337.5, -411), (460, -411), (460, -310.5632392011), (458, -310.5632392011), align=None)
    extrude(amount=-F15_DEPTH)


with BuildPart() as f14b:
    # F13 (on face) → F14, piece 3 (new body)
    with BuildSketch(Plane(origin=(0, 0, -10), x_dir=(1, 0, 0), z_dir=(0, 0, -1))):
        Polygon((118.5, -411), (118.5, -409), (-2, -409), (-2, -310.5632392011), (-4, -310.5632392011), (-4, -411), align=None)
        Polygon((118.5, -409), (118.5, -408.5), (-1.5, -408.5), (-1.5, -310.5632392011), (-2, -310.5632392011), (-2, -409), align=None)
        Polygon((-1.5, -408.5), (118.5, -408.5), (118.5, -402.5), (4.5, -402.5), (4.5, -310.5632392011), (-1.5, -310.5632392011), align=None)
        with Locations((61.5, -356.5316196005)):
            Rectangle(F13_W, F13_H)
    extrude(amount=F14_DEPTH)

    # F13 (on face) → F15, piece 3 (join)
    with BuildSketch(Plane(origin=(0, 0, -10), x_dir=(1, 0, 0), z_dir=(0, 0, -1))):
        Polygon((118.5, -411), (118.5, -409), (-2, -409), (-2, -310.5632392011), (-4, -310.5632392011), (-4, -411), align=None)
    extrude(amount=-F15_DEPTH)


with BuildPart() as f14c:
    # F13 (on face) → F14, piece 4 (new body)
    with BuildSketch(Plane(origin=(0, 0, -10), x_dir=(1, 0, 0), z_dir=(0, 0, -1))):
        Polygon((-4, -96.4367607989), (-2, -96.4367607989), (-2, 2), (118.5, 2), (118.5, 4), (-4, 4), align=None)
        Polygon((-2, -96.4367607989), (-1.5, -96.4367607989), (-1.5, 1.5), (118.5, 1.5), (118.5, 2), (-2, 2), align=None)
        Polygon((-1.5, 1.5), (-1.5, -96.4367607989), (4.5, -96.4367607989), (4.5, -4.5), (118.5, -4.5), (118.5, 1.5), align=None)
        with Locations((61.5, -50.4683803995)):
            Rectangle(F13_W, F13_H)
    extrude(amount=F14_DEPTH)

    # F13 (on face) → F15, piece 2 (join)
    with BuildSketch(Plane(origin=(0, 0, -10), x_dir=(1, 0, 0), z_dir=(0, 0, -1))):
        Polygon((-4, -96.4367607989), (-2, -96.4367607989), (-2, 2), (118.5, 2), (118.5, 4), (-4, 4), align=None)
    extrude(amount=-F15_DEPTH)


solid = Compound([f1.part, f2.part, f3.part, f3b.part, f5.part, f7.part, f7b.part, f7c.part, f7d.part, f9.part, f9b.part, f9c.part, f9d.part, f11.part, f11b.part, f11c.part, f11d.part, f14.part, f14b.part, f14c.part])
